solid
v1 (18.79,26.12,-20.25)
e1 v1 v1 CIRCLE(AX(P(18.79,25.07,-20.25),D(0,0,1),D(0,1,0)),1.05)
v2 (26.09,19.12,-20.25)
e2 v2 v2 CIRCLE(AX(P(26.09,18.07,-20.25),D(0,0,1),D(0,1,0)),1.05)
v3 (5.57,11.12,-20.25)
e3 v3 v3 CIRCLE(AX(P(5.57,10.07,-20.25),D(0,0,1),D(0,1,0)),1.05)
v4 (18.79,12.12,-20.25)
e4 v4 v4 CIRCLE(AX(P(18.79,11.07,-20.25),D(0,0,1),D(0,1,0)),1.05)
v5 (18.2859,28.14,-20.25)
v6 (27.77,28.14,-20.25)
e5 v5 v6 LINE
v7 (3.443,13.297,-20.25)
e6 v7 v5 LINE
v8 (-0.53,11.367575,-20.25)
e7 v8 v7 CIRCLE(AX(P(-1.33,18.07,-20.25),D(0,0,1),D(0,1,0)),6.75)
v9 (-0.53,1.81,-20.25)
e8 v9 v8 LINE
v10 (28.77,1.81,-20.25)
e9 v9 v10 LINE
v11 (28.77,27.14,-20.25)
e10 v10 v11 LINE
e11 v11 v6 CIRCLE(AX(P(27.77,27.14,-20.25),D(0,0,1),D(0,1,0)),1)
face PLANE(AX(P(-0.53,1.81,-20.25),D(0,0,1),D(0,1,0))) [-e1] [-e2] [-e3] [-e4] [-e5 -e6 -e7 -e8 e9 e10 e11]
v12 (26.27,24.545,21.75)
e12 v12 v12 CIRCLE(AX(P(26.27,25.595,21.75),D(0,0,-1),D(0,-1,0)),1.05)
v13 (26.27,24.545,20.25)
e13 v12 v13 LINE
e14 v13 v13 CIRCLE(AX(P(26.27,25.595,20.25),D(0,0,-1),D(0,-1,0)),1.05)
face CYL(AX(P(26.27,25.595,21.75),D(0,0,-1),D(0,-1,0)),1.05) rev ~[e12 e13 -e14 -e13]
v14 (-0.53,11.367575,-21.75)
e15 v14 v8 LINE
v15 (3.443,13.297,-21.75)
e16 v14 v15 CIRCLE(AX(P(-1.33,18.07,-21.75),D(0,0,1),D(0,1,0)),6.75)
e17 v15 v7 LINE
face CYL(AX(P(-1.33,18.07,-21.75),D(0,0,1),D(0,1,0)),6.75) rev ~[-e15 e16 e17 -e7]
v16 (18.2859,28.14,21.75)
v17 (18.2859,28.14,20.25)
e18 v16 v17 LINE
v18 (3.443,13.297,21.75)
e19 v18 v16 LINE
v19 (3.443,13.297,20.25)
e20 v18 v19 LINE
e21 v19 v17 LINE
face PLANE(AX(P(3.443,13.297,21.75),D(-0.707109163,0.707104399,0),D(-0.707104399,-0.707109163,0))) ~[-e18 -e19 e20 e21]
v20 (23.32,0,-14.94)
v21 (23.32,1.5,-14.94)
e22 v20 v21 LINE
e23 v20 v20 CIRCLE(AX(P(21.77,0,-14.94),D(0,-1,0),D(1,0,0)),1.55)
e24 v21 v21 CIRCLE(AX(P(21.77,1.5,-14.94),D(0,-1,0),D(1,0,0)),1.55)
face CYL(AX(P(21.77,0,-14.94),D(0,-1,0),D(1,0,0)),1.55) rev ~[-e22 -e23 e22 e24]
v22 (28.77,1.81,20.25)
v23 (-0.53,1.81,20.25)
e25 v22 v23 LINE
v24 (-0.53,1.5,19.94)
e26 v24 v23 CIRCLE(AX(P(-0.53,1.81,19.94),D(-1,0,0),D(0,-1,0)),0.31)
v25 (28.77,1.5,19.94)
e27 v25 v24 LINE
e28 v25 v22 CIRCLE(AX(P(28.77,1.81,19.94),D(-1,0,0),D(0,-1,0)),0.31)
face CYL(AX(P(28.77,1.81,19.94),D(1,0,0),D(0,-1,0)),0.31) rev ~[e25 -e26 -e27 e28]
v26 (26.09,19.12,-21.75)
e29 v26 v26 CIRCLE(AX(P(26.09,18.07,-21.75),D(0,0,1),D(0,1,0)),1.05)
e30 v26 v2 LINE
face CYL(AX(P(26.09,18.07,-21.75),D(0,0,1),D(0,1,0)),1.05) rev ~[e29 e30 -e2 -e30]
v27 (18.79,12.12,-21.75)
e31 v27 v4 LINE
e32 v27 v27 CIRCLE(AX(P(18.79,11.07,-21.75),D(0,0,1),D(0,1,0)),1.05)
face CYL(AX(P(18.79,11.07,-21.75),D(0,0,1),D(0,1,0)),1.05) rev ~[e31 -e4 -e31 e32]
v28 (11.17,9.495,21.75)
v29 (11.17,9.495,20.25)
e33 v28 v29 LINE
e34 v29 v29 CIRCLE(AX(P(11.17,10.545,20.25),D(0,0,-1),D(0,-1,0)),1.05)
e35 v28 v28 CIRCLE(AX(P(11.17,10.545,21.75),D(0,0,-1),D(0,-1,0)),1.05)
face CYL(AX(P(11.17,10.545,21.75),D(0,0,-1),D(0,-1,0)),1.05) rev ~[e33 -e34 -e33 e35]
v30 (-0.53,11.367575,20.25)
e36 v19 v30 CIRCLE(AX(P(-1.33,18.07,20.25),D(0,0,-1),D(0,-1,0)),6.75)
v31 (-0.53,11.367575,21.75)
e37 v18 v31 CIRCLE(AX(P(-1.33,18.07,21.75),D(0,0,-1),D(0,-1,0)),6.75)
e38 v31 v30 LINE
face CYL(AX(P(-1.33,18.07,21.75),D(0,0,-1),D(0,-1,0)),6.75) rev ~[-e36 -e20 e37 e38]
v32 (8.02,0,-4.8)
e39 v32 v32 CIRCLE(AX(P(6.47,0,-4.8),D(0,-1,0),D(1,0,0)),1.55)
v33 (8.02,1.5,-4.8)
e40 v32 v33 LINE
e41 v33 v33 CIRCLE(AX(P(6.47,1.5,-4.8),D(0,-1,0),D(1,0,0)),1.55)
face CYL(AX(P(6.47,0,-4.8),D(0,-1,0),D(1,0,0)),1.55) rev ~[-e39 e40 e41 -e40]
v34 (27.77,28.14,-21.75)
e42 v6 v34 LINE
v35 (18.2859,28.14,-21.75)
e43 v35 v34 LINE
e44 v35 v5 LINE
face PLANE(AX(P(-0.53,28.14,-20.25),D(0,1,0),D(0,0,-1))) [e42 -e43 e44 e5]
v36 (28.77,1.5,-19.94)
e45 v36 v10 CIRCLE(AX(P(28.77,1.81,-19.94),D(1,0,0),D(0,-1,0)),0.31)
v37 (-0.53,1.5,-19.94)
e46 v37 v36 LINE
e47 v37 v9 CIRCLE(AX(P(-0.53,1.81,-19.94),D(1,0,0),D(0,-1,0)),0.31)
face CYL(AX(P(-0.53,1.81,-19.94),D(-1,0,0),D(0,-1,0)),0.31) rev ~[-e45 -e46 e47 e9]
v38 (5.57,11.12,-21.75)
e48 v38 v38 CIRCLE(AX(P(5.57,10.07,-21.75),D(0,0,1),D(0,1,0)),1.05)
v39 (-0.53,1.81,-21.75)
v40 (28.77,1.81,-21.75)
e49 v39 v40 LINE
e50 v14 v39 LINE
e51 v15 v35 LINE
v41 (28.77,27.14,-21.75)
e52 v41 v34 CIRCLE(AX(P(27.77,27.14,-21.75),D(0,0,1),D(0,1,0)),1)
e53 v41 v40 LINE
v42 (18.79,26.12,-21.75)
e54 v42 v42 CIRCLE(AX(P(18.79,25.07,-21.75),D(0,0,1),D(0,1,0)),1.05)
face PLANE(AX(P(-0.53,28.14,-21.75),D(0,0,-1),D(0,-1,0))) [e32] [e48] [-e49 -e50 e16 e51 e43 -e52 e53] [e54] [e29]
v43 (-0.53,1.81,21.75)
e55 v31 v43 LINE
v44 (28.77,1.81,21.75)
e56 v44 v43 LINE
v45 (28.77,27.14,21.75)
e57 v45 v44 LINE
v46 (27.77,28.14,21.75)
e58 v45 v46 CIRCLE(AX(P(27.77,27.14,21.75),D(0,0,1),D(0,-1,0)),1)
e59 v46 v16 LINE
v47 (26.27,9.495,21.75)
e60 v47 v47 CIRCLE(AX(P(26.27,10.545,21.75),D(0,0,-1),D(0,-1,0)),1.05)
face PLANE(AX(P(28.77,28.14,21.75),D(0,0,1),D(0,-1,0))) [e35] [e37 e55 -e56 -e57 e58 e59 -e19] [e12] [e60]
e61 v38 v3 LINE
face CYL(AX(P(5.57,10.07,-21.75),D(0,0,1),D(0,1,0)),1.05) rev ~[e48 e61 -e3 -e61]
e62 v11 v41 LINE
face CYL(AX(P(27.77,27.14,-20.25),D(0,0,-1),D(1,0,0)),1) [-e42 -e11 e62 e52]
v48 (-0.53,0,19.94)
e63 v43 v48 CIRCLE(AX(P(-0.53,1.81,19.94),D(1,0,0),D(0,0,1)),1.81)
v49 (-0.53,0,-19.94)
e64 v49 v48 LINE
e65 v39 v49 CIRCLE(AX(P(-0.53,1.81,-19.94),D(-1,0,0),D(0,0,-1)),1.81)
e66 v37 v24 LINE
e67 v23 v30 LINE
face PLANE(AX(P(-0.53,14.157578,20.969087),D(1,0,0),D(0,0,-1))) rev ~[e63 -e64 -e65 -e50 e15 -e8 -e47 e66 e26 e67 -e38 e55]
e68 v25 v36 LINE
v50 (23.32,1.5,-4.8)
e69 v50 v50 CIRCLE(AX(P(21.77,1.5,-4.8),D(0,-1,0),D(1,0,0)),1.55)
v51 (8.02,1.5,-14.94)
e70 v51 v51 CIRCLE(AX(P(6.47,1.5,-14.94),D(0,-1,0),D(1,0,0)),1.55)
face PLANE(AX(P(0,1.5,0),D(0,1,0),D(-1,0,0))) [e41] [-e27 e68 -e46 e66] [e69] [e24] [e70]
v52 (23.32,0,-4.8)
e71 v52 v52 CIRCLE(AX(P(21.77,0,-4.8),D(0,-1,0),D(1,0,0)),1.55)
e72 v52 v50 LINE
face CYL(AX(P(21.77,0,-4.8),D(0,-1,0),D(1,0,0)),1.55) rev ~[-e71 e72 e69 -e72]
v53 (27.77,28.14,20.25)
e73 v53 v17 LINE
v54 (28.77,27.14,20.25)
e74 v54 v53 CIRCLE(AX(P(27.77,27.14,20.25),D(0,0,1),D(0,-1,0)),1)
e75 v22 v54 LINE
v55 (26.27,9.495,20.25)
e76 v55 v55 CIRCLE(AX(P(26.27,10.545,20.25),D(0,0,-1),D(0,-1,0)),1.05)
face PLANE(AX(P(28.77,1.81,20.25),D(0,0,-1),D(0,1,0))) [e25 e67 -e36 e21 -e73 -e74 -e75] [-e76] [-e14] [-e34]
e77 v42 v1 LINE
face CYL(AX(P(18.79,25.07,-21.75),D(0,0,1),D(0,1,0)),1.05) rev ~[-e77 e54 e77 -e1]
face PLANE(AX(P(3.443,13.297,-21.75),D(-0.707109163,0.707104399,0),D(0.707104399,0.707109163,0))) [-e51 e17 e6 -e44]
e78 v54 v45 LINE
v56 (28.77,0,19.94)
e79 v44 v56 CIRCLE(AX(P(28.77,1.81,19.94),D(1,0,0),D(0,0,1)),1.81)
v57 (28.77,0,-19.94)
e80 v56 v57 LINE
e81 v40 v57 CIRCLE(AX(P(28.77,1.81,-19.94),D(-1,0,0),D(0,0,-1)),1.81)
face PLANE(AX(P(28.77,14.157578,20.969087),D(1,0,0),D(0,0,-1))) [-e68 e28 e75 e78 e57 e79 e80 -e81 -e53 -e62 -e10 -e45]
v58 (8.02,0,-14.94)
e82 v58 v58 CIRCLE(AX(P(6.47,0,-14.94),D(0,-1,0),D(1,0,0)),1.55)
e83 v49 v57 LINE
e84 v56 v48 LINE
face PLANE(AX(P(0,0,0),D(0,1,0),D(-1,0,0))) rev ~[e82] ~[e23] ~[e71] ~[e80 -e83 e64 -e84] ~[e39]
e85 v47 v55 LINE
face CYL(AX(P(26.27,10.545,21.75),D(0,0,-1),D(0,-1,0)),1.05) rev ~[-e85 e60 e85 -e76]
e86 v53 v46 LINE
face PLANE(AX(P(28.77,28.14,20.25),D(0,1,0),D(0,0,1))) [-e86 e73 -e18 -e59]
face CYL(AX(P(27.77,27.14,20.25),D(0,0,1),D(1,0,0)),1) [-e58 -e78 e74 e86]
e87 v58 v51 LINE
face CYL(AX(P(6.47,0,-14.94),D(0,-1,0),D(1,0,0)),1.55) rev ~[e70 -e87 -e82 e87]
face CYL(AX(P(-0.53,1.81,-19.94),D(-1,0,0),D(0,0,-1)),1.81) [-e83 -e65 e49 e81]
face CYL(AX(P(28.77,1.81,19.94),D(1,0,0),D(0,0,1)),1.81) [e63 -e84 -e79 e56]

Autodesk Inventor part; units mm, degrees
ref_plane "YZ Plane" through (0, 0, 0) normal (1, 0, 0) x (0, 1, 0)
ref_plane "XZ Plane" through (0, 0, 0) normal (0, 1, 0) x (-1, 0, 0)
ref_plane "XY Plane" through (0, 0, 0) normal (0, 0, 1) x (1, 0, 0)
sketch "Sketch1" plane through (0, 0, 0) normal (0, 1, 0) x (-1, 0, 0)
  line L0 (0.53, 20.25) -> (-28.77, 20.25)
  line L1 (-28.77, 20.25) -> (-28.77, -20.25)
  line L2 (-28.77, -20.25) -> (0.53, -20.25)
  line L3 (0.53, -20.25) -> (0.53, 20.25)
  point P0 (0, 0)
  dimension "d0" = 40.5
  dimension "d1" = 29.3
  dimension "d2" = -0.53
  dimension "d3" = 20.25
extrude "Plate1" add sketch "Sketch1" along normal blind 1.5
sketch "Sketch2" plane through (28.77, 0, 21.75) normal (0, 0, -1) x (-1, 0, 0)
  line L0 (29.3, 0) -> (0, 0)
  line L1 (0, 0) -> (0, 28.14)
  line L2 (0, 28.14) -> (29.3, 28.14)
  line L3 (29.3, 28.14) -> (29.3, 0)
edge flange "Flange1" height 28.14 angle 90 thickness 1.5 bend radius 0.31 thickness toward (0, 0, -1) relief tear relief width 1.5 relief depth 0.75 corner gap 0.31 corner form 0 edges at (14.12, 1.5, 20.25) (14.12, 1.5, -20.25) wall of the first edge with corners at (-0.53, 0, 21.75) (28.77, 0, 21.75) (28.77, 28.14, 21.75) (-0.53, 28.14, 21.75)
bend "Bend1"
corner "Corner1"
sketch "Sketch6" plane through (-0.53, 28.14, 21.75) normal (0, 0, 1) x (1, 0, 0)
  point P0 (0.53, -28.14)
sketch "Sketch9" plane through (28.77, 28.14, -21.75) normal (0, 0, -1) x (-1, 0, 0)
  circle A0 centre (30.1, -10.07) radius 6
  point P0 (28.77, -28.14)
sketch "Sketch10" plane through (-0.53, 28.14, 21.75) normal (0, 0, 1) x (1, 0, 0)
  point P0 (0.53, -28.14)
sketch "Sketch11" plane through (-0.53, 28.14, 21.75) normal (0, 0, 1) x (1, 0, 0)
  point P0 (0.53, -28.14)
sketch "Sketch15" plane through (0, 0, 0) normal (0, -1, 0) x (1, 0, 0)
  point P0 (0, 0)
sketch "Sketch16" plane through (0, 0, 0) normal (0, -1, 0) x (1, 0, 0)
  circle A0 centre (6.47, -4.8) radius 1.55
  line L0 (28.77, 19.94) -> (-0.53, 19.94) projected
  line L1 (-0.53, -19.94) -> (-0.53, 19.94) projected
  circle A1 centre (21.77, -4.8) radius 1.55
  line L2 (28.77, 19.94) -> (28.77, -19.94) projected
  circle A2 centre (6.47, -14.94) radius 1.55
  circle A3 centre (21.77, -14.94) radius 1.55
  line L3 (-0.53, -19.94) -> (28.77, -19.94) projected
  point P0 (0, 0)
  dimension "d65" = 3.1
  dimension "d67" = 7
  dimension "d68" = 3.1
  dimension "d70" = 7
  dimension "d71" = 3.1
  dimension "d73" = 7
  dimension "d74" = 3.1
  dimension "d76" = 7
  dimension "d96" = 5
  dimension "d97" = 15.14
  dimension "d98" = 5
  dimension "d99" = 15.14
extrude "Cut6" cut sketch "Sketch16" against normal blind 1.5 contours A0 | A1 | A2 | A3
sketch "Sketch18" plane through (-0.53, 28.14, 21.75) normal (0, 0, 1) x (1, 0, 0)
  circle A0 centre (-0.8, -10.07) radius 6
  point P0 (0.53, -28.14)
fillet "Corner Round1" radius 1 4 edges at (-0.53, 28.14, -21) (28.77, 28.14, -21) (28.77, 28.14, 21) (-0.53, 28.14, 21)
sketch "Sketch21" plane through (28.77, 1.81, -21.75) normal (0, 0, -1) x (-1, 0, 0)
  circle A0 centre (2.68, 16.26) radius 0.7835 projected
  circle A1 centre (9.98, 23.26) radius 0.7835 projected
  circle A2 centre (23.2, 24.26) radius 0.7835 projected
  circle A3 centre (9.98, 9.26) radius 0.7835 projected
  circle A4 centre (23.2, 8.26) radius 0.7835 projected
  point P0 (28.77, -1.81)
hole "Hole8" at (18.79, 25.07, -21.75) at (5.57, 26.07, -21.75) at (26.09, 18.07, -21.75) at (18.79, 11.07, -21.75) at (5.57, 10.07, -21.75) direction (0, 0, 1) diameter 2.1 depth 1.5 tip angle 118
sketch "Sketch22" plane through (-0.53, 1.81, 21.75) normal (0, 0, 1) x (1, 0, 0)
  circle A0 centre (26.8, 23.785) radius 0.7835 projected
  circle A1 centre (11.7, 23.785) radius 0.7835 projected
  circle A2 centre (26.8, 8.735) radius 0.7835 projected
  circle A3 centre (11.7, 8.735) radius 0.7835 projected
  point P0 (0.53, -1.81)
hole "Hole9" at (11.17, 25.595, 21.75) at (11.17, 10.545, 21.75) at (26.27, 25.595, 21.75) at (26.27, 10.545, 21.75) direction (0, 0, -1) diameter 2.1 depth 1.5 tip angle 118
hole "Hole10" at (-1.33, 18.07, 21.75) direction (0, 0, -1) diameter 13.5 depth 1.5
hole "Hole11" at (-1.33, 18.07, -21.75) direction (0, 0, 1) diameter 13.5 depth 1.5
sketch "Sketch24" plane through (28.77, 1.81, -21.75) normal (0, 0, -1) x (-1, 0, 0)
  arc A0 (29.3, 22.9624) -> (29.3, 9.5576) centre (30.1, 16.26) ccw projected
  line L0 (25.327, 11.487) -> (10.4841, 26.33)
  line L1 (1, 26.33) -> (28.3, 26.33) projected
  line L2 (29.3, 25.33) -> (29.3, 22.9624) projected
  line L3 (10.4841, 26.33) -> (28.3, 26.33)
  arc A1 (29.3, 25.33) -> (28.3, 26.33) centre (28.3, 25.33) ccw
  line L4 (29.3, 25.33) -> (29.3, 22.9624)
  arc A2 (29.3, 22.9624) -> (25.327, 11.487) centre (30.1, 16.26) ccw
  point P0 (28.77, -1.81)
  point P1 (10.4841, 26.33)
  dimension "d137" = 0
  dimension "d138" = 45
extrude "Cut8" cut sketch "Sketch24" against normal blind 1.5
mirror "Mirror1" about plane through (0, 0, 0) normal (0, 0, 1) of "Cut8"
equation "\"d77\" = Thickness"
equation "\"d119\" = Thickness"
equation "\"d126\" = Thickness"
equation "\"d133\" = Thickness"
equation "\"d139\" = Thickness"
equation "\"d4\" = Thickness"
equation "\"d5\" = BendReliefWidth"
equation "\"d6\" = BendReliefDepth"
equation "\"d7\" = MinimumRemnant"
equation "\"d8\" = TransitionRadius"
equation "\"d11\" = BendRadius"
equation "\"d12\" = CornerReliefSize"
equation "\"d13\" = GapSize"
equation "\"d14\" = JacobiRadiusSize"
equation "\"BendReliefWidth\" = Thickness"
equation "\"BendReliefDepth\" = 0.5 * Thickness"
equation "\"CornerReliefSize\" = 4 * Thickness"
equation "\"MinimumRemnant\" = 2 * Thickness"
equation "\"TransitionRadius\" = BendRadius"
equation "\"JacobiRadiusSize\" = BendRadius"
equation "\"GapSize\" = Thickness"
equation "\"Thickness\" = 1.5"
equation "\"BendRadius\" = 0.31"
properties part number "axis_16_bottom_frame" material "Aluminum 6061-AHC"
